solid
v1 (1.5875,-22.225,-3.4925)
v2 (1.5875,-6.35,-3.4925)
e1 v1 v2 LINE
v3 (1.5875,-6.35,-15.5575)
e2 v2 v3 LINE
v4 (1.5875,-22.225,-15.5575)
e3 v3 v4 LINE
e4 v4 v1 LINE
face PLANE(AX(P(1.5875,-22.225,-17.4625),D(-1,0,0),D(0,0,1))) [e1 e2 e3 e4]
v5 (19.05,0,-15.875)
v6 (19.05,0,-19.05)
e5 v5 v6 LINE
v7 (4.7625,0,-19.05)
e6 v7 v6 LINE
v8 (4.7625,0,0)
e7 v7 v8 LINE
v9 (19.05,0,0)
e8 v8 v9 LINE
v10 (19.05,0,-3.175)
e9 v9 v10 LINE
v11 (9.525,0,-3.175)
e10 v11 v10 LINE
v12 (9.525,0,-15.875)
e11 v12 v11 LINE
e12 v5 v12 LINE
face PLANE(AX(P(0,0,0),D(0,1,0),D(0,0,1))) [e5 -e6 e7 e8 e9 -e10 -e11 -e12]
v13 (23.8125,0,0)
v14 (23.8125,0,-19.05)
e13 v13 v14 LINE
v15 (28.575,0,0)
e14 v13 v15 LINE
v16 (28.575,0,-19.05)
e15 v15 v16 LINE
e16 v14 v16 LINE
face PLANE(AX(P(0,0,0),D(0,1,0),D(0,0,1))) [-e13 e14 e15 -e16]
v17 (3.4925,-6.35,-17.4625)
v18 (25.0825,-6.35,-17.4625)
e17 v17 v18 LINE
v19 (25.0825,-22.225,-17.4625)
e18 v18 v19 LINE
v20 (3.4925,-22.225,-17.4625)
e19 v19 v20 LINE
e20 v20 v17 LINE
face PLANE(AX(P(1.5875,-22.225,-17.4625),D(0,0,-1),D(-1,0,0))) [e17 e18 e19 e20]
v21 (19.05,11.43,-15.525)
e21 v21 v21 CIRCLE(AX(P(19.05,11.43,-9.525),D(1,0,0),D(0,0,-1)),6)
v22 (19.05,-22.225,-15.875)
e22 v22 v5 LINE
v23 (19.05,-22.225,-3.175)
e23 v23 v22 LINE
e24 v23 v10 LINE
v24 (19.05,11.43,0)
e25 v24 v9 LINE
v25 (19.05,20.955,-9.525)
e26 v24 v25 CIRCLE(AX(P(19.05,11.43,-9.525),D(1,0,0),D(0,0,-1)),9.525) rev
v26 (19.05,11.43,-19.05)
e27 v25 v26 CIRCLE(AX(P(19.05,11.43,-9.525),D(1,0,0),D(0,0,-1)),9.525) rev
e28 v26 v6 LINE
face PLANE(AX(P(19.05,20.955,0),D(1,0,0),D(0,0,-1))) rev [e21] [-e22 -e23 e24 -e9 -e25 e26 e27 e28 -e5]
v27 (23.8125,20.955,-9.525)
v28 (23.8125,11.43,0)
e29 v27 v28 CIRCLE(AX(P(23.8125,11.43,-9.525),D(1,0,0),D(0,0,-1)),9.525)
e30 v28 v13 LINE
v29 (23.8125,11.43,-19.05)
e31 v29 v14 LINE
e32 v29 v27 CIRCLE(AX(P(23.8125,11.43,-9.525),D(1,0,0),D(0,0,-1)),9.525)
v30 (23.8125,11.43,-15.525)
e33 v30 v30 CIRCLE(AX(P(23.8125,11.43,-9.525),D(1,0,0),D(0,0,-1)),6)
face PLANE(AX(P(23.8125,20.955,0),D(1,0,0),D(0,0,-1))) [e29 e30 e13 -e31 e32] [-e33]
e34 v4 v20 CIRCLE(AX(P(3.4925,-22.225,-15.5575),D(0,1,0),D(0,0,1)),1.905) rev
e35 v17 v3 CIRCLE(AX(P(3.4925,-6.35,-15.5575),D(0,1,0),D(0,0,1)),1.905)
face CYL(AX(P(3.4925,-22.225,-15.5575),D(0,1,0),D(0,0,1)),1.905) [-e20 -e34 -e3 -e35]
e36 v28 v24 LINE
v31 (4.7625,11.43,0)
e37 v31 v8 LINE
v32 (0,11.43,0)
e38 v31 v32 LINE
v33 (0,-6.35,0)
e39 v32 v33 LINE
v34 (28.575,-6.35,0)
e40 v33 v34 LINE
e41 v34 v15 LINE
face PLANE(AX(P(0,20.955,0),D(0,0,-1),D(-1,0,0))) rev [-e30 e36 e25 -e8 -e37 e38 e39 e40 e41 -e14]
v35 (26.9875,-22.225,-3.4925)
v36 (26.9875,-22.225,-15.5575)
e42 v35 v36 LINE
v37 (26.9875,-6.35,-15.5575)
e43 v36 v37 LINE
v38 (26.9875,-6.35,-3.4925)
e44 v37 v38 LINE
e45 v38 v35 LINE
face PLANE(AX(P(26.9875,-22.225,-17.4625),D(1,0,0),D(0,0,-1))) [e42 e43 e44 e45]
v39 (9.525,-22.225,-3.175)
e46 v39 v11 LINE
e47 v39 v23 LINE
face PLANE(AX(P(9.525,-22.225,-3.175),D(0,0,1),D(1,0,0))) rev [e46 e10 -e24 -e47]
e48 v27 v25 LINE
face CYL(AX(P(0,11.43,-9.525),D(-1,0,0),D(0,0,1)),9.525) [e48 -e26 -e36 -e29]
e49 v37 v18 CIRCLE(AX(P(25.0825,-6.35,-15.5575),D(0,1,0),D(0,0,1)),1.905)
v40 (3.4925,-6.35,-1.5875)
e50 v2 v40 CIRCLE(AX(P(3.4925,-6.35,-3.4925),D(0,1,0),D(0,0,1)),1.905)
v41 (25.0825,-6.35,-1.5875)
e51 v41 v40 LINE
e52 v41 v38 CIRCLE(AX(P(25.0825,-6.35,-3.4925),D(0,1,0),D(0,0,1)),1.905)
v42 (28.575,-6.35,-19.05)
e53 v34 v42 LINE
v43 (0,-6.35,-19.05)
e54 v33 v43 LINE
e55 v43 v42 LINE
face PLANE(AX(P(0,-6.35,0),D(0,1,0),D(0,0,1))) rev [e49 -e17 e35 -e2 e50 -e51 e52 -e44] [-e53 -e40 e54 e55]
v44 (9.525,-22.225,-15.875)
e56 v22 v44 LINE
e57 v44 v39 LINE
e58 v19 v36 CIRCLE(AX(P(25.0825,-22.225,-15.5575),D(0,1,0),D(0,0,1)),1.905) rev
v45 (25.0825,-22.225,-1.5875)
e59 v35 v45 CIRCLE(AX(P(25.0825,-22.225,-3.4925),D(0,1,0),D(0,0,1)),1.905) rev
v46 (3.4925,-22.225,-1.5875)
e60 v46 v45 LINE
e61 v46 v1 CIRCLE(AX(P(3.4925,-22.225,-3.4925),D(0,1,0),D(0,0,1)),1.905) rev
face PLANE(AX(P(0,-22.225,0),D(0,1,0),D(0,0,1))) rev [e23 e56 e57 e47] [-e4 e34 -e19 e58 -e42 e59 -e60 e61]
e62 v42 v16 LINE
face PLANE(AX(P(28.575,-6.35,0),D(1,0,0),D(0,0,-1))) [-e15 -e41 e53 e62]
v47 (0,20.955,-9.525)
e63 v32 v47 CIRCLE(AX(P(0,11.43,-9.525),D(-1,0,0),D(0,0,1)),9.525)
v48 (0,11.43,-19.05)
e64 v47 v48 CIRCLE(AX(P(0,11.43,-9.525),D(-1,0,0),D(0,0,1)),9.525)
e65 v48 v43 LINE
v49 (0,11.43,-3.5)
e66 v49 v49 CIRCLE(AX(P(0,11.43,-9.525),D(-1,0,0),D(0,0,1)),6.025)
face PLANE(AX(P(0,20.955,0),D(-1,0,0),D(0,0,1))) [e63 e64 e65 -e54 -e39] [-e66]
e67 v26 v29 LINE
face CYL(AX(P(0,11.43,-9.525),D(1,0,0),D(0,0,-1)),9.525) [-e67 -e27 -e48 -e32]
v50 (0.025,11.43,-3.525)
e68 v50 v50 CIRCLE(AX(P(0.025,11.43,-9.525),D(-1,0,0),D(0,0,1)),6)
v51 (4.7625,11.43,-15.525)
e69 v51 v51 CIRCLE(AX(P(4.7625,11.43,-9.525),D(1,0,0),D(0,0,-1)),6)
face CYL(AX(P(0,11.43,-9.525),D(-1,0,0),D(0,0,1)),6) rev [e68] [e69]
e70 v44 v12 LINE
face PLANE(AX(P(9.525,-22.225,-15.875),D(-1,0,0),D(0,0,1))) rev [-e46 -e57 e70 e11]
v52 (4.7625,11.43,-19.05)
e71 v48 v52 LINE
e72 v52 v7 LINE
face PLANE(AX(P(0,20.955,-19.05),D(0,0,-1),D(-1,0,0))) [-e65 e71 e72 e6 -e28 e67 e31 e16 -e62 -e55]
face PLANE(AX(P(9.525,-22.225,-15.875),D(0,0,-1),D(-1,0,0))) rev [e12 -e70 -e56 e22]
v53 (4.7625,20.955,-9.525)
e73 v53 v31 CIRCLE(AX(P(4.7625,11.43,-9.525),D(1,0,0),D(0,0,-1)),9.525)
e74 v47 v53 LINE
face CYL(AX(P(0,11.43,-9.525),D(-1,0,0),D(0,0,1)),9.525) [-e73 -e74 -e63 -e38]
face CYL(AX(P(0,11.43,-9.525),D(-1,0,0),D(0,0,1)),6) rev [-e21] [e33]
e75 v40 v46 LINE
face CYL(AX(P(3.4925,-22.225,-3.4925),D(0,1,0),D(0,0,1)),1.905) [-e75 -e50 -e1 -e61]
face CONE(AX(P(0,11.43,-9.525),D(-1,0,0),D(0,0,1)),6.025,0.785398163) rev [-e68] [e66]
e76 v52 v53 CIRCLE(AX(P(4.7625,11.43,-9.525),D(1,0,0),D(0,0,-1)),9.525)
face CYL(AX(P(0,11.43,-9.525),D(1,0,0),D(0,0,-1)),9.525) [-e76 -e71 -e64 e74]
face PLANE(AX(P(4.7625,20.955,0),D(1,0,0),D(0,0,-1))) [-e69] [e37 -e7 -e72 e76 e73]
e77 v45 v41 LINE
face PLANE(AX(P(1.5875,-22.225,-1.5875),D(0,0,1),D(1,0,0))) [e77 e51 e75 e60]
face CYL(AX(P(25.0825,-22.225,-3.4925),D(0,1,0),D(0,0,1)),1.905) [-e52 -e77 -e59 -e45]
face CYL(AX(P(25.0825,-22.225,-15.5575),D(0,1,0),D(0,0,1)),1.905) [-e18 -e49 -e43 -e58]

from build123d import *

# Parameters (mm, degrees)
SKETCH2_W                        = 4.7625
SKETCH2_H                        = 19.05
BOSS_EXTRUDE1_DEPTH              = 20.955
BOSS_EXTRUDE1_2_DEPTH            = 20.955
SKETCH3_W                        = 25.4
SKETCH3_H                        = 15.875
BOSS_EXTRUDE2_DEPTH              = 22.225
SKETCH2_3_W                      = 14.2875
SKETCH2_3_H                      = 19.05
SKETCH2_3_W_2                    = 4.7625
BOSS_EXTRUDE3_DEPTH              = 6.35
FILLET1_R                        = 9.525
F_12_0MM_DOWEL_HOLE1_D           = 12
F_12_0MM_DOWEL_HOLE1_CSINK_D     = 12.05
F_12_0MM_DOWEL_HOLE1_CSINK_ANGLE = 90
FILLET2_R                        = 1.905
SKETCH5_W                        = 9.525
SKETCH5_H                        = 12.7
CUT_EXTRUDE1_DEPTH               = 41.907013457


with BuildPart() as part:
    # Sketch2 → Boss-Extrude1 (new body)
    with BuildSketch(Plane(origin=(0, 0, 0), x_dir=(1, 0, 0), z_dir=(0, 1, 0))):
        with Locations((2.38125, 9.525)):
            Rectangle(SKETCH2_W, SKETCH2_H)
    extrude(amount=BOSS_EXTRUDE1_DEPTH)



with BuildPart() as body_2:
    # Sketch2 → Boss-Extrude1 2 (new body)
    with BuildSketch(Plane(origin=(0, 0, 0), x_dir=(1, 0, 0), z_dir=(0, 1, 0))):
        with Locations((21.43125, 9.525)):
            Rectangle(SKETCH2_W, SKETCH2_H)
    extrude(amount=BOSS_EXTRUDE1_2_DEPTH)


with BuildPart() as part_1:
    add(part.part)

    add(body_2.part)  # Boss-Extrude2 merges body 2
    # Sketch3 → Boss-Extrude2 (add)
    with BuildSketch(Plane(origin=(0, 0, 0), x_dir=(1, 0, 0), z_dir=(0, 1, 0))):
        with Locations((14.2875, 9.525)):
            Rectangle(SKETCH3_W, SKETCH3_H)
    extrude(amount=-BOSS_EXTRUDE2_DEPTH)

    # Sketch2<3> → Boss-Extrude3 (add)
    with BuildSketch(Plane(origin=(0, 0, 0), x_dir=(1, 0, 0), z_dir=(0, 1, 0))):
        with Locations((11.90625, 9.525)):
            Rectangle(SKETCH2_3_W, SKETCH2_3_H)
        with Locations((26.19375, 9.525)):
            Rectangle(SKETCH2_3_W_2, SKETCH2_3_H)
        with Locations((2.38125, 9.525)):
            Rectangle(SKETCH2_3_W_2, SKETCH2_3_H)
        with Locations((21.43125, 9.525)):
            Rectangle(SKETCH2_3_W_2, SKETCH2_3_H)
    extrude(amount=-BOSS_EXTRUDE3_DEPTH)

    # Fillet1
    fillet1_edges = [part_1.edges().sort_by_distance(p)[0] for p in [
        (2.38125, 20.955, -19.05),
        (2.38125, 20.955, 0),
        (21.43125, 20.955, 0),
        (21.43125, 20.955, -19.05),
    ]]
    fillet(fillet1_edges, radius=FILLET1_R - 0.0001)  # a hair under: the kernel refuses the full size

    # Ø12.0mm Dowel Hole1 (through all)
    with Locations(Plane(origin=(0, 11.43, -9.525), x_dir=(0, 0, -1), z_dir=(-1, 0, 0))):
        with Locations((0, 0)):
            CounterSinkHole(F_12_0MM_DOWEL_HOLE1_D / 2, F_12_0MM_DOWEL_HOLE1_CSINK_D / 2, counter_sink_angle=F_12_0MM_DOWEL_HOLE1_CSINK_ANGLE)

    # Fillet2
    fillet2_edges = [part_1.edges().sort_by_distance(p)[0] for p in [
        (1.5875, -14.2875, -1.5875),
        (1.5875, -14.2875, -17.4625),
        (26.9875, -14.2875, -17.4625),
        (26.9875, -14.2875, -1.5875),
    ]]
    fillet(fillet2_edges, radius=FILLET2_R)

    # Sketch5 → Cut-Extrude1 (cut, through all)
    with BuildSketch(Plane(origin=(0, 0, 0), x_dir=(1, 0, 0), z_dir=(0, 1, 0))):
        with Locations((14.2875, 9.525)):
            Rectangle(SKETCH5_W, SKETCH5_H)
    extrude(amount=-CUT_EXTRUDE1_DEPTH, mode=Mode.SUBTRACT)


solid = part_1.part
